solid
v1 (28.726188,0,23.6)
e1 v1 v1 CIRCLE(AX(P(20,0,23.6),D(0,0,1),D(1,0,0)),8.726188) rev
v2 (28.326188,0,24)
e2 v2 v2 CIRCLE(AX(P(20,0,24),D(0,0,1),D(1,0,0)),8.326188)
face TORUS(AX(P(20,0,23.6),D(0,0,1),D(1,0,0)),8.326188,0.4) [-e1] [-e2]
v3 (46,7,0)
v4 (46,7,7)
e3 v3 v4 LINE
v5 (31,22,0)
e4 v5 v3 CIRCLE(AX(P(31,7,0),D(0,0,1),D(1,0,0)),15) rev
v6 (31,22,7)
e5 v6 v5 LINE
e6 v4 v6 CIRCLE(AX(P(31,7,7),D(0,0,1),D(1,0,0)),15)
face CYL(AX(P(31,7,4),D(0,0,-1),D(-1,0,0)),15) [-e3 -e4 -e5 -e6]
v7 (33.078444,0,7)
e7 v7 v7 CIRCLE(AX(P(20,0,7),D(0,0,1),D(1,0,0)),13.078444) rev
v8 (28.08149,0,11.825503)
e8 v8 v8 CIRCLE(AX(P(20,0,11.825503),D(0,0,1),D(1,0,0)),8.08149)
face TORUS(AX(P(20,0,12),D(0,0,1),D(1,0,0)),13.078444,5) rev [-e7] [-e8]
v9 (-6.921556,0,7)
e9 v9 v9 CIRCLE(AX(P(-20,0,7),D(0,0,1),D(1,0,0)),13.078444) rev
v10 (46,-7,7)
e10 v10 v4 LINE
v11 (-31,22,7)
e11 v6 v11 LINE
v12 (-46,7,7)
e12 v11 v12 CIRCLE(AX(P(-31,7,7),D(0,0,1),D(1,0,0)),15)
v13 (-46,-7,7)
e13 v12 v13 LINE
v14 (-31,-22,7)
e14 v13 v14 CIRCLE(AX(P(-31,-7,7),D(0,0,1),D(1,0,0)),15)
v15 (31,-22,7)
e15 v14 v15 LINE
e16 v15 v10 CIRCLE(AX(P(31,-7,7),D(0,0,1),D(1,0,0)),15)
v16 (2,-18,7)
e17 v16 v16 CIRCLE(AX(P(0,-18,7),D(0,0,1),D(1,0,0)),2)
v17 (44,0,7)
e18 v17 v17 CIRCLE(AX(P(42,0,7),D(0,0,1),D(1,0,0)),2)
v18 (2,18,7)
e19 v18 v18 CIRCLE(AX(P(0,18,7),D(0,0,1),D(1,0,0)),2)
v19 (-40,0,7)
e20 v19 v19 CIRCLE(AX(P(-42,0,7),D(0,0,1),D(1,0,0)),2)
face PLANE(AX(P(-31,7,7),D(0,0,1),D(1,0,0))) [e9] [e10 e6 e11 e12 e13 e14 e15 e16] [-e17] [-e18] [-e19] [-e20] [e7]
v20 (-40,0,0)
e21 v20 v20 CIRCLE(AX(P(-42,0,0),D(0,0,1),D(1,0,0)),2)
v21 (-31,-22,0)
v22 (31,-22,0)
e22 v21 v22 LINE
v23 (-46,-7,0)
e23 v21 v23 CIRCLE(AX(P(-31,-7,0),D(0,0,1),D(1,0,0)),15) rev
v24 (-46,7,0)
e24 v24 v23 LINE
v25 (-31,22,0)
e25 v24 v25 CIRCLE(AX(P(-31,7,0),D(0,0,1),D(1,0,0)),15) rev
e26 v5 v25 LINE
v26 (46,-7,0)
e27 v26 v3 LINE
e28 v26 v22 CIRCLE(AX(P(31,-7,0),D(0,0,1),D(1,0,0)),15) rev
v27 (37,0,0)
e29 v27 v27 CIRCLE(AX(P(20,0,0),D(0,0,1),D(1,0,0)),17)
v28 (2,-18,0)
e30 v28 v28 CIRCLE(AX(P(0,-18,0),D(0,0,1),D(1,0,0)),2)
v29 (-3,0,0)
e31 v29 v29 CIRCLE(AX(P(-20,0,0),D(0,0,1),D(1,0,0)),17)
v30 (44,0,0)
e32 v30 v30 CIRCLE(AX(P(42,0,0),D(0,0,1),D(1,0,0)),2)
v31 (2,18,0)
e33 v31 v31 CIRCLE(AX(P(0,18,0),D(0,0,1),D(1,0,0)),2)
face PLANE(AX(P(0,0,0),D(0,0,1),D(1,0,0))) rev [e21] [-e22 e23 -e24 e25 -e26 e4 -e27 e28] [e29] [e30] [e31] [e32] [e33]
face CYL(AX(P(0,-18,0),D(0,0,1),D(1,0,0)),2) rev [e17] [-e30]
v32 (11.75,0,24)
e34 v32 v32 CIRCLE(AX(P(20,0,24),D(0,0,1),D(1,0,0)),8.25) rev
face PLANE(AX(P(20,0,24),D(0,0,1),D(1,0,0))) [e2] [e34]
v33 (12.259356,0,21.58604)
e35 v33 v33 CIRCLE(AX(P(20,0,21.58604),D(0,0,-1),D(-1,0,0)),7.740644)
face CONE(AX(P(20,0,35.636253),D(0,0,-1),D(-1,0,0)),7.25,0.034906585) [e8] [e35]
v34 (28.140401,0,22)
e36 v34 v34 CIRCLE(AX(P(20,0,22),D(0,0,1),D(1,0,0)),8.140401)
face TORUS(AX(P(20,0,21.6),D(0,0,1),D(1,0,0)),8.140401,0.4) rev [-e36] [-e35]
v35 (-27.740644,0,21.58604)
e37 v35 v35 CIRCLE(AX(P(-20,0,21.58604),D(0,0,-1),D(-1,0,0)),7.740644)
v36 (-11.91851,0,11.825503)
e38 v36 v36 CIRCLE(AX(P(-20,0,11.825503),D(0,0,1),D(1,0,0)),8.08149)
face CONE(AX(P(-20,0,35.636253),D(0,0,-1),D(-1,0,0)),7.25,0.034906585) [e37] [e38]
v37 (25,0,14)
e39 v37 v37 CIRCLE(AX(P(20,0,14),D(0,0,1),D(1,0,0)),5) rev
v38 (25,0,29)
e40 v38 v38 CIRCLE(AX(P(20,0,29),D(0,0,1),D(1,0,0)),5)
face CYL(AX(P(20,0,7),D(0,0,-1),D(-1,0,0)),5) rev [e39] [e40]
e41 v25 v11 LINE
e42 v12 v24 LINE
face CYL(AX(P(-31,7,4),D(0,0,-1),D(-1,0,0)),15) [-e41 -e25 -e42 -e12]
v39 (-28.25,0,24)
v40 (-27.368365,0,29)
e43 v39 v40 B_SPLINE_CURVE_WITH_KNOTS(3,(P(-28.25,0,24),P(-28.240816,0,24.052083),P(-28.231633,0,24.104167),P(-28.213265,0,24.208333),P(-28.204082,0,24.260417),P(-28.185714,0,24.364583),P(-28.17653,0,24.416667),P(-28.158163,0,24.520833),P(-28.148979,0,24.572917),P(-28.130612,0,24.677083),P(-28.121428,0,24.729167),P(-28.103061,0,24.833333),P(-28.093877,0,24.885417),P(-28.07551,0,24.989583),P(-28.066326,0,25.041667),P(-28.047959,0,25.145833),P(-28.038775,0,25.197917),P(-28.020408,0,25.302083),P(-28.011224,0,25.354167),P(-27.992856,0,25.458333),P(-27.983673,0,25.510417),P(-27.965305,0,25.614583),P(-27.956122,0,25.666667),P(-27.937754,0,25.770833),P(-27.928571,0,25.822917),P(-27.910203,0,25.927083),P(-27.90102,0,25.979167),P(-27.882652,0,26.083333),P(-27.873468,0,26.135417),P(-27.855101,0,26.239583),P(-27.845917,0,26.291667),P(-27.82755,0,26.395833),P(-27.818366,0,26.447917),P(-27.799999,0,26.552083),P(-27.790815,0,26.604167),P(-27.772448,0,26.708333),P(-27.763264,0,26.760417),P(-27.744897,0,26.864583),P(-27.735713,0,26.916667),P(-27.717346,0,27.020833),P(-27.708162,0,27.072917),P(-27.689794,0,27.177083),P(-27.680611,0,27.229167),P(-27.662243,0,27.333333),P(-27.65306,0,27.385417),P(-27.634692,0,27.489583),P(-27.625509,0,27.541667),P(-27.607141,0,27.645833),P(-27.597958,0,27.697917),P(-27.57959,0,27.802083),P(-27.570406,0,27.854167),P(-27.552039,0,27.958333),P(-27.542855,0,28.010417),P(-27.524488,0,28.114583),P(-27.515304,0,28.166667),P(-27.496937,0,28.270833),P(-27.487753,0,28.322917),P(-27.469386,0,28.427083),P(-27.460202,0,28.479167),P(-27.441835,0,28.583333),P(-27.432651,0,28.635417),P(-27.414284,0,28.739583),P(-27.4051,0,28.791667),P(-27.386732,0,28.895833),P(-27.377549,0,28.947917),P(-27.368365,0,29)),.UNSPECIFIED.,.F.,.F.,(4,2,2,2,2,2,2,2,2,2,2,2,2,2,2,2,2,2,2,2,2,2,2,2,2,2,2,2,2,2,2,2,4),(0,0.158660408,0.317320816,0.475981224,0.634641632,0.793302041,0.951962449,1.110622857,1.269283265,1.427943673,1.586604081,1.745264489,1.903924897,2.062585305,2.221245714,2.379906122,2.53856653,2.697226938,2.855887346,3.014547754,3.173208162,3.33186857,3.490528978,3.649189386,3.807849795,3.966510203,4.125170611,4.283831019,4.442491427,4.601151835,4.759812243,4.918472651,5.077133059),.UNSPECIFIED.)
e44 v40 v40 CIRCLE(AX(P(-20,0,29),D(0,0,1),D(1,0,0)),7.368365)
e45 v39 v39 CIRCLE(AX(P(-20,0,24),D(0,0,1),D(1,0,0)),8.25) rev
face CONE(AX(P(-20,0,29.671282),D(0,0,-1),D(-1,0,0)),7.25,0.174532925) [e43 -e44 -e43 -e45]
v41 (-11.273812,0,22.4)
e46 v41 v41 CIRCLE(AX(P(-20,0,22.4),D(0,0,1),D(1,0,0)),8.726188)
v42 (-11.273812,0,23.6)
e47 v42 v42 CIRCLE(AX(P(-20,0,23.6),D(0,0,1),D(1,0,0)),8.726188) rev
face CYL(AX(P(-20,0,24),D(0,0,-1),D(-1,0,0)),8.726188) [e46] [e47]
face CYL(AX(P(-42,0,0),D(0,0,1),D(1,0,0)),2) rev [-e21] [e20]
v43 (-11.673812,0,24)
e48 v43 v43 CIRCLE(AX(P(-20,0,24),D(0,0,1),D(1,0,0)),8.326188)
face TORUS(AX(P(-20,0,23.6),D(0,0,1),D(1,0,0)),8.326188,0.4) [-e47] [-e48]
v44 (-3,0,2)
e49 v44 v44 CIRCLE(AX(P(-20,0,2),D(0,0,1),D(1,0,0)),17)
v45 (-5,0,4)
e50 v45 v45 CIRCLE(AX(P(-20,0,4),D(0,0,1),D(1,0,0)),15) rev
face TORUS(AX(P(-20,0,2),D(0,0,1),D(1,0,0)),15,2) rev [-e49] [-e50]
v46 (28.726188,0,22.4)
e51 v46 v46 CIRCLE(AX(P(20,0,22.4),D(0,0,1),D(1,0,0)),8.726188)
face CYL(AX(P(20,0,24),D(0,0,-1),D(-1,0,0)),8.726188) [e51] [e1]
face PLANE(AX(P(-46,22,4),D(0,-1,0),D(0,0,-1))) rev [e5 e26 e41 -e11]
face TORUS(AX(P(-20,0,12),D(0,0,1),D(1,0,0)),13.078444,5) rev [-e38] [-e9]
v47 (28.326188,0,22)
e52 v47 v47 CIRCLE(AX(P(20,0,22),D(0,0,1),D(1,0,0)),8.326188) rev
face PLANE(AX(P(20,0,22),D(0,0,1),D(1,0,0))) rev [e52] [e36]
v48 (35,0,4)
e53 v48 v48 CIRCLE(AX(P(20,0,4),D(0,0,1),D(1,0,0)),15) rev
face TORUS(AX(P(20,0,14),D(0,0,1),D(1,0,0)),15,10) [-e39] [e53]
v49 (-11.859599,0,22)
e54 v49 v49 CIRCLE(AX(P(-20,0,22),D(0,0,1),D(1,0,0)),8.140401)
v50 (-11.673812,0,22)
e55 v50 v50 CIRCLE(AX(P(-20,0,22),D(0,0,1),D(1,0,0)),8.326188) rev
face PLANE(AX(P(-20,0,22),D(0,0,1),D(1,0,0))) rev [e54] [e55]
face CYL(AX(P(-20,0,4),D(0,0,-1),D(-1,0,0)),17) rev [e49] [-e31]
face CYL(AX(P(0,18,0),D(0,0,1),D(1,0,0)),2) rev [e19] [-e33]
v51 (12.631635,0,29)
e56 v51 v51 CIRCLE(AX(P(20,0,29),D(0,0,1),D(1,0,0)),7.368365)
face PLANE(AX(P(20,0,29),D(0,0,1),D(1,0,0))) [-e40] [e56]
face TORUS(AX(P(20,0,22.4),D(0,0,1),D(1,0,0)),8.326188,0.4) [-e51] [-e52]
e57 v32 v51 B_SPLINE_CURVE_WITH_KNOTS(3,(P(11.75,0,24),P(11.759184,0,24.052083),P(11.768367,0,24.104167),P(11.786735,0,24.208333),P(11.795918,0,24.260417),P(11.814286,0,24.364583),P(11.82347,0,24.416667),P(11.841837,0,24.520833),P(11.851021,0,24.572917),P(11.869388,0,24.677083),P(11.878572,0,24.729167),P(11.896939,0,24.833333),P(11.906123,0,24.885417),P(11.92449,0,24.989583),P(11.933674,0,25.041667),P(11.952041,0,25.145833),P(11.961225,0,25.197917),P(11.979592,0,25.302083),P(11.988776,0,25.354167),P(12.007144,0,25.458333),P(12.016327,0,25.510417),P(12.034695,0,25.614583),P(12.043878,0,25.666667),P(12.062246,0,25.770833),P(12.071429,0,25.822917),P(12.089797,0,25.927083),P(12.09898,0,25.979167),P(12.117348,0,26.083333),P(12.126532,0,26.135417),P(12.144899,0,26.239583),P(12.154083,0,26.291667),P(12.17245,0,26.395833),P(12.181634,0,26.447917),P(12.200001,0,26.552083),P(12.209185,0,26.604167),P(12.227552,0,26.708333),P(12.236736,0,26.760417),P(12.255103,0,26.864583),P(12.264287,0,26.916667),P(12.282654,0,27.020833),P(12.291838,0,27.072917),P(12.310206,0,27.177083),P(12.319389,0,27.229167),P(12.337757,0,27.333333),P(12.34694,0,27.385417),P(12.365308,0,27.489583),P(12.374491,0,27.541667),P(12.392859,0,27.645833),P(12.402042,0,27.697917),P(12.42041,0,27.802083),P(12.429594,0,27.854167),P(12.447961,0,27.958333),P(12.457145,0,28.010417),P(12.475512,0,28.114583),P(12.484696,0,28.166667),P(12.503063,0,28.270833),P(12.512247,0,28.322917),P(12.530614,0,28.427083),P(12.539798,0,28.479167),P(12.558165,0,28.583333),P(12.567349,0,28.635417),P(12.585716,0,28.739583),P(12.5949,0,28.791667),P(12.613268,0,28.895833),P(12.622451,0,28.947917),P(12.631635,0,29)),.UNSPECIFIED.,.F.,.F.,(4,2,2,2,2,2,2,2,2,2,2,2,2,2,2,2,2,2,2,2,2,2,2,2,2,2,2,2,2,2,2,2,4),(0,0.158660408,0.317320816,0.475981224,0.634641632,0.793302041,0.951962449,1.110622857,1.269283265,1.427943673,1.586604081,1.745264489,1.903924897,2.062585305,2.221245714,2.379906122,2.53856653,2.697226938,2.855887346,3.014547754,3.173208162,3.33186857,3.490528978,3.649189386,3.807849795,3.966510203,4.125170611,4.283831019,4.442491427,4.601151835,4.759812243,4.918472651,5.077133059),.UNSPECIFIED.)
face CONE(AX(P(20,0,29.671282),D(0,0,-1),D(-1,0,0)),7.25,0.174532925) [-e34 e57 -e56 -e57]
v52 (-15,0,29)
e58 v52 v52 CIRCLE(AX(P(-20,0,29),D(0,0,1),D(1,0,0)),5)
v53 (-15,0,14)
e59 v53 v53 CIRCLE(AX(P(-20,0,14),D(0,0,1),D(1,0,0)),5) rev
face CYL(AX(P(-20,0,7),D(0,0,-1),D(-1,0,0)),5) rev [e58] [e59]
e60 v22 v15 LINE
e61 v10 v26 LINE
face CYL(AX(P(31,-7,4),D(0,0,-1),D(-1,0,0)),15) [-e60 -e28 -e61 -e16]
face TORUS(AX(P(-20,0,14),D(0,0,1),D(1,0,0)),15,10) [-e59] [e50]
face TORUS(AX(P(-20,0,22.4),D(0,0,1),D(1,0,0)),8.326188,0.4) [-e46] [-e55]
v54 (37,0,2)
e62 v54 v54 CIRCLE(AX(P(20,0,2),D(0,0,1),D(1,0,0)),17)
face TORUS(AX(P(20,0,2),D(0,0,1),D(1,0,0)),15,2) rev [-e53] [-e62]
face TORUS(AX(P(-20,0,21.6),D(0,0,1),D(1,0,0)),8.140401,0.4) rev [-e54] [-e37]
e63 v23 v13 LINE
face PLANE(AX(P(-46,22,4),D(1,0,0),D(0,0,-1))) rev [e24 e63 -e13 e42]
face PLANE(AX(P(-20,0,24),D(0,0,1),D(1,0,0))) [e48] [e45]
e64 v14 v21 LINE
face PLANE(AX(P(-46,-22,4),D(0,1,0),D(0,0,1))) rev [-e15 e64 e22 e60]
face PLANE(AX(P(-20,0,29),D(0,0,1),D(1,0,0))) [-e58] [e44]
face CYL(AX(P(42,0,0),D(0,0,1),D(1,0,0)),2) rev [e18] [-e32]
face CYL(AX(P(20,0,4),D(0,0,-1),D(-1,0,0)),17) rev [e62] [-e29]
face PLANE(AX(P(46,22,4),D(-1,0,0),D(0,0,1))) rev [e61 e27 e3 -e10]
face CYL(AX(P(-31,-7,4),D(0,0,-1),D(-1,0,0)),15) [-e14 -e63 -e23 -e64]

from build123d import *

# Parameters (mm, degrees)
SKETCH1_W           = 92
SKETCH1_H           = 44
SKETCH1_R           = 17
BOSS_EXTRUDE1_DEPTH = 4
FILLET1_R           = 15
BOSS_EXTRUDE2_START = 3
SKETCH2_R           = 5
BOSS_EXTRUDE2_DEPTH = 3
BOSS_EXTRUDE3_START = 15
SKETCH3_R           = 7.25
SKETCH3_R_2         = 5
BOSS_EXTRUDE3_DEPTH = 15
CHAMFER1_SIZE       = 1
CHAMFER1_SIZE_2     = 28.636253283
FILLET2_R           = 2
FILLET3_R           = 10
FILLET4_R           = 5
BOSS_EXTRUDE4_START = 2
SKETCH4_R           = 8.726188458
SKETCH4_R_2         = 5
BOSS_EXTRUDE4_DEPTH = 2
BOSS_EXTRUDE5_START = 5
SKETCH6_R           = 7.25
SKETCH6_R_2         = 5
BOSS_EXTRUDE5_DEPTH = 5
FILLET5_R           = 0.4
CHAMFER2_SIZE       = 1
CHAMFER2_SIZE_2     = 5.67128182
SKETCH8_R           = 2
CUT_EXTRUDE1_DEPTH  = 56.533773508


# Some blends are built 0.0001 mm under size
with BuildPart() as part:
    # Sketch1 → Boss-Extrude1 (new body)
    with BuildSketch(Plane.XY):
        Rectangle(SKETCH1_W, SKETCH1_H)
        with Locations((20, 0)):
            Circle(SKETCH1_R, mode=Mode.SUBTRACT)
        with Locations((-20, 0)):
            Circle(SKETCH1_R, mode=Mode.SUBTRACT)
    extrude(amount=BOSS_EXTRUDE1_DEPTH)

    # Fillet1
    fillet1_edges = [part.edges().sort_by_distance(p)[0] for p in [
        (-46, 22, 2),
        (46, 22, 2),
        (46, -22, 2),
        (-46, -22, 2),
    ]]
    fillet(fillet1_edges, radius=FILLET1_R)

    # Sketch2 → Boss-Extrude2 (add)
    with BuildSketch(Plane.XY.offset(4).offset(BOSS_EXTRUDE2_START)):
        with BuildLine():
            Line((-46, 7), (-46, -7))
            ThreePointArc((-46, -7), (-41.606601718, -17.606601718), (-31, -22))
            Line((-31, -22), (31, -22))
            ThreePointArc((31, -22), (41.606601718, -17.606601718), (46, -7))
            Line((46, -7), (46, 7))
            ThreePointArc((46, 7), (41.606601718, 17.606601718), (31, 22))
            Line((31, 22), (-31, 22))
            ThreePointArc((-31, 22), (-41.606601718, 17.606601718), (-46, 7))
        make_face()
        with Locations((-20, 0)):
            Circle(SKETCH2_R, mode=Mode.SUBTRACT)
        with Locations((20, 0)):
            Circle(SKETCH2_R, mode=Mode.SUBTRACT)
    extrude(amount=-BOSS_EXTRUDE2_DEPTH)

    # Sketch3 → Boss-Extrude3 (add)
    # profile 1 of 2: a face of its own
    with BuildSketch(Plane.XY.offset(7).offset(BOSS_EXTRUDE3_START)):
        with Locations((-20, 0)):
            Circle(SKETCH3_R)
        with Locations((-20, 0)):
            Circle(SKETCH3_R_2, mode=Mode.SUBTRACT)
    # profile 2 of 2: a face of its own
    with BuildSketch(Plane.XY.offset(7).offset(BOSS_EXTRUDE3_START)):
        with Locations((20, 0)):
            Circle(SKETCH3_R)
        with Locations((20, 0)):
            Circle(SKETCH3_R_2, mode=Mode.SUBTRACT)
    extrude(amount=-BOSS_EXTRUDE3_DEPTH)

    # Chamfer1
    # the kernel refuses this chamfer: 28.636253283, 1 mm, written as the material it adds along each edge
    with BuildSketch(Plane(origin=(-20, 0, 7), x_dir=(1, 0, 0), z_dir=(0, -1, 0))) as chamfer1_piece_1_section:
        Polygon((7.25 + CHAMFER1_SIZE, 0), (7.25, CHAMFER1_SIZE_2), (7.25, 0), align=None)
    chamfer1_piece_1 = revolve(axis=Axis((-20, 0, 7), (0, 0, 1)), mode=Mode.PRIVATE)
    chamfer1_piece_1 = split(chamfer1_piece_1, bisect_by=Plane(origin=(-27.910107183, 0, 22), z_dir=(0, 0, -1)), keep=Keep.TOP, mode=Mode.PRIVATE)
    add(chamfer1_piece_1)
    with BuildSketch(Plane(origin=(20, 0, 7), x_dir=(1, 0, 0), z_dir=(0, -1, 0))) as chamfer1_piece_2_section:
        Polygon((7.25 + CHAMFER1_SIZE, 0), (7.25, CHAMFER1_SIZE_2), (7.25, 0), align=None)
    chamfer1_piece_2 = revolve(axis=Axis((20, 0, 7), (0, 0, 1)), mode=Mode.PRIVATE)
    chamfer1_piece_2 = split(chamfer1_piece_2, bisect_by=Plane(origin=(12.089892824, 0, 22), z_dir=(0, 0, -1)), keep=Keep.TOP, mode=Mode.PRIVATE)
    add(chamfer1_piece_2)

    # Fillet2
    fillet2_edges = [part.edges().sort_by_distance(p)[0] for p in [
        (3, 0, 4),
        (-37, 0, 4),
    ]]
    fillet(fillet2_edges, radius=FILLET2_R)

    # Fillet3
    fillet3_edges = [part.edges().sort_by_distance(p)[0] for p in [
        (15, 0, 4),
        (-25, 0, 4),
    ]]
    fillet(fillet3_edges, radius=FILLET3_R - 0.0001)  # a hair under: the kernel refuses the full size

    # Fillet4
    fillet4_edges = [part.edges().sort_by_distance(p)[0] for p in [
        (11.75, 0, 7),
        (-28.25, 0, 7),
    ]]
    fillet(fillet4_edges, radius=FILLET4_R)

    # Sketch4 → Boss-Extrude4 (add)
    # profile 1 of 2: a face of its own
    with BuildSketch(Plane.XY.offset(22).offset(BOSS_EXTRUDE4_START)):
        with Locations((-20, 0)):
            Circle(SKETCH4_R)
        with Locations((-20, 0)):
            Circle(SKETCH4_R_2, mode=Mode.SUBTRACT)
    # profile 2 of 2: a face of its own
    with BuildSketch(Plane.XY.offset(22).offset(BOSS_EXTRUDE4_START)):
        with Locations((20, 0)):
            Circle(SKETCH4_R)
        with Locations((20, 0)):
            Circle(SKETCH4_R_2, mode=Mode.SUBTRACT)
    extrude(amount=-BOSS_EXTRUDE4_DEPTH)

    # Sketch6 → Boss-Extrude5 (add)
    # profile 1 of 2: a face of its own
    with BuildSketch(Plane.XY.offset(24).offset(BOSS_EXTRUDE5_START)):
        with Locations((20, 0)):
            Circle(SKETCH6_R)
        with Locations((20, 0)):
            Circle(SKETCH6_R_2, mode=Mode.SUBTRACT)
    # profile 2 of 2: a face of its own
    with BuildSketch(Plane.XY.offset(24).offset(BOSS_EXTRUDE5_START)):
        with Locations((-20, 0)):
            Circle(SKETCH6_R)
        with Locations((-20, 0)):
            Circle(SKETCH6_R_2, mode=Mode.SUBTRACT)
    extrude(amount=-BOSS_EXTRUDE5_DEPTH)

    # Fillet5
    fillet5_edges = [part.edges().sort_by_distance(p)[0] for p in [
        (-28.726188458, 0, 24),
        (-28.726188458, 0, 22),
        (11.273811542, 0, 24),
        (11.273811542, 0, 22),
        (-27.726188458, 0, 22),
        (12.273811542, 0, 22),
    ]]
    fillet(fillet5_edges, radius=FILLET5_R)

    # Chamfer2
    # the kernel refuses this chamfer: 5.67128182, 1 mm, written as the material it adds along each edge
    with BuildSketch(Plane(origin=(20, 0, 24), x_dir=(1, 0, 0), z_dir=(0, -1, 0))) as chamfer2_piece_1_section:
        Polygon((7.25 + CHAMFER2_SIZE, 0), (7.25, CHAMFER2_SIZE_2), (7.25, 0), align=None)
    chamfer2_piece_1 = revolve(axis=Axis((20, 0, 24), (0, 0, 1)), mode=Mode.PRIVATE)
    chamfer2_piece_1 = split(chamfer2_piece_1, bisect_by=Plane(origin=(12.225375497, 0, 29), z_dir=(0, 0, -1)), keep=Keep.TOP, mode=Mode.PRIVATE)
    add(chamfer2_piece_1)
    with BuildSketch(Plane(origin=(-20, 0, 24), x_dir=(1, 0, 0), z_dir=(0, -1, 0))) as chamfer2_piece_2_section:
        Polygon((7.25 + CHAMFER2_SIZE, 0), (7.25, CHAMFER2_SIZE_2), (7.25, 0), align=None)
    chamfer2_piece_2 = revolve(axis=Axis((-20, 0, 24), (0, 0, 1)), mode=Mode.PRIVATE)
    chamfer2_piece_2 = split(chamfer2_piece_2, bisect_by=Plane(origin=(-27.774624504, 0, 29), z_dir=(0, 0, -1)), keep=Keep.TOP, mode=Mode.PRIVATE)
    add(chamfer2_piece_2)

    # Sketch8 → Cut-Extrude1 (cut, through all)
    with BuildSketch(Plane.XY.offset(7)):
        with Locations((0, 18)):
            Circle(SKETCH8_R)
        with Locations((0, -18)):
            Circle(SKETCH8_R)
        with Locations((42, 0)):
            Circle(SKETCH8_R)
        with Locations((-42, 0)):
            Circle(SKETCH8_R)
    extrude(amount=-CUT_EXTRUDE1_DEPTH, mode=Mode.SUBTRACT)


solid = part.part
